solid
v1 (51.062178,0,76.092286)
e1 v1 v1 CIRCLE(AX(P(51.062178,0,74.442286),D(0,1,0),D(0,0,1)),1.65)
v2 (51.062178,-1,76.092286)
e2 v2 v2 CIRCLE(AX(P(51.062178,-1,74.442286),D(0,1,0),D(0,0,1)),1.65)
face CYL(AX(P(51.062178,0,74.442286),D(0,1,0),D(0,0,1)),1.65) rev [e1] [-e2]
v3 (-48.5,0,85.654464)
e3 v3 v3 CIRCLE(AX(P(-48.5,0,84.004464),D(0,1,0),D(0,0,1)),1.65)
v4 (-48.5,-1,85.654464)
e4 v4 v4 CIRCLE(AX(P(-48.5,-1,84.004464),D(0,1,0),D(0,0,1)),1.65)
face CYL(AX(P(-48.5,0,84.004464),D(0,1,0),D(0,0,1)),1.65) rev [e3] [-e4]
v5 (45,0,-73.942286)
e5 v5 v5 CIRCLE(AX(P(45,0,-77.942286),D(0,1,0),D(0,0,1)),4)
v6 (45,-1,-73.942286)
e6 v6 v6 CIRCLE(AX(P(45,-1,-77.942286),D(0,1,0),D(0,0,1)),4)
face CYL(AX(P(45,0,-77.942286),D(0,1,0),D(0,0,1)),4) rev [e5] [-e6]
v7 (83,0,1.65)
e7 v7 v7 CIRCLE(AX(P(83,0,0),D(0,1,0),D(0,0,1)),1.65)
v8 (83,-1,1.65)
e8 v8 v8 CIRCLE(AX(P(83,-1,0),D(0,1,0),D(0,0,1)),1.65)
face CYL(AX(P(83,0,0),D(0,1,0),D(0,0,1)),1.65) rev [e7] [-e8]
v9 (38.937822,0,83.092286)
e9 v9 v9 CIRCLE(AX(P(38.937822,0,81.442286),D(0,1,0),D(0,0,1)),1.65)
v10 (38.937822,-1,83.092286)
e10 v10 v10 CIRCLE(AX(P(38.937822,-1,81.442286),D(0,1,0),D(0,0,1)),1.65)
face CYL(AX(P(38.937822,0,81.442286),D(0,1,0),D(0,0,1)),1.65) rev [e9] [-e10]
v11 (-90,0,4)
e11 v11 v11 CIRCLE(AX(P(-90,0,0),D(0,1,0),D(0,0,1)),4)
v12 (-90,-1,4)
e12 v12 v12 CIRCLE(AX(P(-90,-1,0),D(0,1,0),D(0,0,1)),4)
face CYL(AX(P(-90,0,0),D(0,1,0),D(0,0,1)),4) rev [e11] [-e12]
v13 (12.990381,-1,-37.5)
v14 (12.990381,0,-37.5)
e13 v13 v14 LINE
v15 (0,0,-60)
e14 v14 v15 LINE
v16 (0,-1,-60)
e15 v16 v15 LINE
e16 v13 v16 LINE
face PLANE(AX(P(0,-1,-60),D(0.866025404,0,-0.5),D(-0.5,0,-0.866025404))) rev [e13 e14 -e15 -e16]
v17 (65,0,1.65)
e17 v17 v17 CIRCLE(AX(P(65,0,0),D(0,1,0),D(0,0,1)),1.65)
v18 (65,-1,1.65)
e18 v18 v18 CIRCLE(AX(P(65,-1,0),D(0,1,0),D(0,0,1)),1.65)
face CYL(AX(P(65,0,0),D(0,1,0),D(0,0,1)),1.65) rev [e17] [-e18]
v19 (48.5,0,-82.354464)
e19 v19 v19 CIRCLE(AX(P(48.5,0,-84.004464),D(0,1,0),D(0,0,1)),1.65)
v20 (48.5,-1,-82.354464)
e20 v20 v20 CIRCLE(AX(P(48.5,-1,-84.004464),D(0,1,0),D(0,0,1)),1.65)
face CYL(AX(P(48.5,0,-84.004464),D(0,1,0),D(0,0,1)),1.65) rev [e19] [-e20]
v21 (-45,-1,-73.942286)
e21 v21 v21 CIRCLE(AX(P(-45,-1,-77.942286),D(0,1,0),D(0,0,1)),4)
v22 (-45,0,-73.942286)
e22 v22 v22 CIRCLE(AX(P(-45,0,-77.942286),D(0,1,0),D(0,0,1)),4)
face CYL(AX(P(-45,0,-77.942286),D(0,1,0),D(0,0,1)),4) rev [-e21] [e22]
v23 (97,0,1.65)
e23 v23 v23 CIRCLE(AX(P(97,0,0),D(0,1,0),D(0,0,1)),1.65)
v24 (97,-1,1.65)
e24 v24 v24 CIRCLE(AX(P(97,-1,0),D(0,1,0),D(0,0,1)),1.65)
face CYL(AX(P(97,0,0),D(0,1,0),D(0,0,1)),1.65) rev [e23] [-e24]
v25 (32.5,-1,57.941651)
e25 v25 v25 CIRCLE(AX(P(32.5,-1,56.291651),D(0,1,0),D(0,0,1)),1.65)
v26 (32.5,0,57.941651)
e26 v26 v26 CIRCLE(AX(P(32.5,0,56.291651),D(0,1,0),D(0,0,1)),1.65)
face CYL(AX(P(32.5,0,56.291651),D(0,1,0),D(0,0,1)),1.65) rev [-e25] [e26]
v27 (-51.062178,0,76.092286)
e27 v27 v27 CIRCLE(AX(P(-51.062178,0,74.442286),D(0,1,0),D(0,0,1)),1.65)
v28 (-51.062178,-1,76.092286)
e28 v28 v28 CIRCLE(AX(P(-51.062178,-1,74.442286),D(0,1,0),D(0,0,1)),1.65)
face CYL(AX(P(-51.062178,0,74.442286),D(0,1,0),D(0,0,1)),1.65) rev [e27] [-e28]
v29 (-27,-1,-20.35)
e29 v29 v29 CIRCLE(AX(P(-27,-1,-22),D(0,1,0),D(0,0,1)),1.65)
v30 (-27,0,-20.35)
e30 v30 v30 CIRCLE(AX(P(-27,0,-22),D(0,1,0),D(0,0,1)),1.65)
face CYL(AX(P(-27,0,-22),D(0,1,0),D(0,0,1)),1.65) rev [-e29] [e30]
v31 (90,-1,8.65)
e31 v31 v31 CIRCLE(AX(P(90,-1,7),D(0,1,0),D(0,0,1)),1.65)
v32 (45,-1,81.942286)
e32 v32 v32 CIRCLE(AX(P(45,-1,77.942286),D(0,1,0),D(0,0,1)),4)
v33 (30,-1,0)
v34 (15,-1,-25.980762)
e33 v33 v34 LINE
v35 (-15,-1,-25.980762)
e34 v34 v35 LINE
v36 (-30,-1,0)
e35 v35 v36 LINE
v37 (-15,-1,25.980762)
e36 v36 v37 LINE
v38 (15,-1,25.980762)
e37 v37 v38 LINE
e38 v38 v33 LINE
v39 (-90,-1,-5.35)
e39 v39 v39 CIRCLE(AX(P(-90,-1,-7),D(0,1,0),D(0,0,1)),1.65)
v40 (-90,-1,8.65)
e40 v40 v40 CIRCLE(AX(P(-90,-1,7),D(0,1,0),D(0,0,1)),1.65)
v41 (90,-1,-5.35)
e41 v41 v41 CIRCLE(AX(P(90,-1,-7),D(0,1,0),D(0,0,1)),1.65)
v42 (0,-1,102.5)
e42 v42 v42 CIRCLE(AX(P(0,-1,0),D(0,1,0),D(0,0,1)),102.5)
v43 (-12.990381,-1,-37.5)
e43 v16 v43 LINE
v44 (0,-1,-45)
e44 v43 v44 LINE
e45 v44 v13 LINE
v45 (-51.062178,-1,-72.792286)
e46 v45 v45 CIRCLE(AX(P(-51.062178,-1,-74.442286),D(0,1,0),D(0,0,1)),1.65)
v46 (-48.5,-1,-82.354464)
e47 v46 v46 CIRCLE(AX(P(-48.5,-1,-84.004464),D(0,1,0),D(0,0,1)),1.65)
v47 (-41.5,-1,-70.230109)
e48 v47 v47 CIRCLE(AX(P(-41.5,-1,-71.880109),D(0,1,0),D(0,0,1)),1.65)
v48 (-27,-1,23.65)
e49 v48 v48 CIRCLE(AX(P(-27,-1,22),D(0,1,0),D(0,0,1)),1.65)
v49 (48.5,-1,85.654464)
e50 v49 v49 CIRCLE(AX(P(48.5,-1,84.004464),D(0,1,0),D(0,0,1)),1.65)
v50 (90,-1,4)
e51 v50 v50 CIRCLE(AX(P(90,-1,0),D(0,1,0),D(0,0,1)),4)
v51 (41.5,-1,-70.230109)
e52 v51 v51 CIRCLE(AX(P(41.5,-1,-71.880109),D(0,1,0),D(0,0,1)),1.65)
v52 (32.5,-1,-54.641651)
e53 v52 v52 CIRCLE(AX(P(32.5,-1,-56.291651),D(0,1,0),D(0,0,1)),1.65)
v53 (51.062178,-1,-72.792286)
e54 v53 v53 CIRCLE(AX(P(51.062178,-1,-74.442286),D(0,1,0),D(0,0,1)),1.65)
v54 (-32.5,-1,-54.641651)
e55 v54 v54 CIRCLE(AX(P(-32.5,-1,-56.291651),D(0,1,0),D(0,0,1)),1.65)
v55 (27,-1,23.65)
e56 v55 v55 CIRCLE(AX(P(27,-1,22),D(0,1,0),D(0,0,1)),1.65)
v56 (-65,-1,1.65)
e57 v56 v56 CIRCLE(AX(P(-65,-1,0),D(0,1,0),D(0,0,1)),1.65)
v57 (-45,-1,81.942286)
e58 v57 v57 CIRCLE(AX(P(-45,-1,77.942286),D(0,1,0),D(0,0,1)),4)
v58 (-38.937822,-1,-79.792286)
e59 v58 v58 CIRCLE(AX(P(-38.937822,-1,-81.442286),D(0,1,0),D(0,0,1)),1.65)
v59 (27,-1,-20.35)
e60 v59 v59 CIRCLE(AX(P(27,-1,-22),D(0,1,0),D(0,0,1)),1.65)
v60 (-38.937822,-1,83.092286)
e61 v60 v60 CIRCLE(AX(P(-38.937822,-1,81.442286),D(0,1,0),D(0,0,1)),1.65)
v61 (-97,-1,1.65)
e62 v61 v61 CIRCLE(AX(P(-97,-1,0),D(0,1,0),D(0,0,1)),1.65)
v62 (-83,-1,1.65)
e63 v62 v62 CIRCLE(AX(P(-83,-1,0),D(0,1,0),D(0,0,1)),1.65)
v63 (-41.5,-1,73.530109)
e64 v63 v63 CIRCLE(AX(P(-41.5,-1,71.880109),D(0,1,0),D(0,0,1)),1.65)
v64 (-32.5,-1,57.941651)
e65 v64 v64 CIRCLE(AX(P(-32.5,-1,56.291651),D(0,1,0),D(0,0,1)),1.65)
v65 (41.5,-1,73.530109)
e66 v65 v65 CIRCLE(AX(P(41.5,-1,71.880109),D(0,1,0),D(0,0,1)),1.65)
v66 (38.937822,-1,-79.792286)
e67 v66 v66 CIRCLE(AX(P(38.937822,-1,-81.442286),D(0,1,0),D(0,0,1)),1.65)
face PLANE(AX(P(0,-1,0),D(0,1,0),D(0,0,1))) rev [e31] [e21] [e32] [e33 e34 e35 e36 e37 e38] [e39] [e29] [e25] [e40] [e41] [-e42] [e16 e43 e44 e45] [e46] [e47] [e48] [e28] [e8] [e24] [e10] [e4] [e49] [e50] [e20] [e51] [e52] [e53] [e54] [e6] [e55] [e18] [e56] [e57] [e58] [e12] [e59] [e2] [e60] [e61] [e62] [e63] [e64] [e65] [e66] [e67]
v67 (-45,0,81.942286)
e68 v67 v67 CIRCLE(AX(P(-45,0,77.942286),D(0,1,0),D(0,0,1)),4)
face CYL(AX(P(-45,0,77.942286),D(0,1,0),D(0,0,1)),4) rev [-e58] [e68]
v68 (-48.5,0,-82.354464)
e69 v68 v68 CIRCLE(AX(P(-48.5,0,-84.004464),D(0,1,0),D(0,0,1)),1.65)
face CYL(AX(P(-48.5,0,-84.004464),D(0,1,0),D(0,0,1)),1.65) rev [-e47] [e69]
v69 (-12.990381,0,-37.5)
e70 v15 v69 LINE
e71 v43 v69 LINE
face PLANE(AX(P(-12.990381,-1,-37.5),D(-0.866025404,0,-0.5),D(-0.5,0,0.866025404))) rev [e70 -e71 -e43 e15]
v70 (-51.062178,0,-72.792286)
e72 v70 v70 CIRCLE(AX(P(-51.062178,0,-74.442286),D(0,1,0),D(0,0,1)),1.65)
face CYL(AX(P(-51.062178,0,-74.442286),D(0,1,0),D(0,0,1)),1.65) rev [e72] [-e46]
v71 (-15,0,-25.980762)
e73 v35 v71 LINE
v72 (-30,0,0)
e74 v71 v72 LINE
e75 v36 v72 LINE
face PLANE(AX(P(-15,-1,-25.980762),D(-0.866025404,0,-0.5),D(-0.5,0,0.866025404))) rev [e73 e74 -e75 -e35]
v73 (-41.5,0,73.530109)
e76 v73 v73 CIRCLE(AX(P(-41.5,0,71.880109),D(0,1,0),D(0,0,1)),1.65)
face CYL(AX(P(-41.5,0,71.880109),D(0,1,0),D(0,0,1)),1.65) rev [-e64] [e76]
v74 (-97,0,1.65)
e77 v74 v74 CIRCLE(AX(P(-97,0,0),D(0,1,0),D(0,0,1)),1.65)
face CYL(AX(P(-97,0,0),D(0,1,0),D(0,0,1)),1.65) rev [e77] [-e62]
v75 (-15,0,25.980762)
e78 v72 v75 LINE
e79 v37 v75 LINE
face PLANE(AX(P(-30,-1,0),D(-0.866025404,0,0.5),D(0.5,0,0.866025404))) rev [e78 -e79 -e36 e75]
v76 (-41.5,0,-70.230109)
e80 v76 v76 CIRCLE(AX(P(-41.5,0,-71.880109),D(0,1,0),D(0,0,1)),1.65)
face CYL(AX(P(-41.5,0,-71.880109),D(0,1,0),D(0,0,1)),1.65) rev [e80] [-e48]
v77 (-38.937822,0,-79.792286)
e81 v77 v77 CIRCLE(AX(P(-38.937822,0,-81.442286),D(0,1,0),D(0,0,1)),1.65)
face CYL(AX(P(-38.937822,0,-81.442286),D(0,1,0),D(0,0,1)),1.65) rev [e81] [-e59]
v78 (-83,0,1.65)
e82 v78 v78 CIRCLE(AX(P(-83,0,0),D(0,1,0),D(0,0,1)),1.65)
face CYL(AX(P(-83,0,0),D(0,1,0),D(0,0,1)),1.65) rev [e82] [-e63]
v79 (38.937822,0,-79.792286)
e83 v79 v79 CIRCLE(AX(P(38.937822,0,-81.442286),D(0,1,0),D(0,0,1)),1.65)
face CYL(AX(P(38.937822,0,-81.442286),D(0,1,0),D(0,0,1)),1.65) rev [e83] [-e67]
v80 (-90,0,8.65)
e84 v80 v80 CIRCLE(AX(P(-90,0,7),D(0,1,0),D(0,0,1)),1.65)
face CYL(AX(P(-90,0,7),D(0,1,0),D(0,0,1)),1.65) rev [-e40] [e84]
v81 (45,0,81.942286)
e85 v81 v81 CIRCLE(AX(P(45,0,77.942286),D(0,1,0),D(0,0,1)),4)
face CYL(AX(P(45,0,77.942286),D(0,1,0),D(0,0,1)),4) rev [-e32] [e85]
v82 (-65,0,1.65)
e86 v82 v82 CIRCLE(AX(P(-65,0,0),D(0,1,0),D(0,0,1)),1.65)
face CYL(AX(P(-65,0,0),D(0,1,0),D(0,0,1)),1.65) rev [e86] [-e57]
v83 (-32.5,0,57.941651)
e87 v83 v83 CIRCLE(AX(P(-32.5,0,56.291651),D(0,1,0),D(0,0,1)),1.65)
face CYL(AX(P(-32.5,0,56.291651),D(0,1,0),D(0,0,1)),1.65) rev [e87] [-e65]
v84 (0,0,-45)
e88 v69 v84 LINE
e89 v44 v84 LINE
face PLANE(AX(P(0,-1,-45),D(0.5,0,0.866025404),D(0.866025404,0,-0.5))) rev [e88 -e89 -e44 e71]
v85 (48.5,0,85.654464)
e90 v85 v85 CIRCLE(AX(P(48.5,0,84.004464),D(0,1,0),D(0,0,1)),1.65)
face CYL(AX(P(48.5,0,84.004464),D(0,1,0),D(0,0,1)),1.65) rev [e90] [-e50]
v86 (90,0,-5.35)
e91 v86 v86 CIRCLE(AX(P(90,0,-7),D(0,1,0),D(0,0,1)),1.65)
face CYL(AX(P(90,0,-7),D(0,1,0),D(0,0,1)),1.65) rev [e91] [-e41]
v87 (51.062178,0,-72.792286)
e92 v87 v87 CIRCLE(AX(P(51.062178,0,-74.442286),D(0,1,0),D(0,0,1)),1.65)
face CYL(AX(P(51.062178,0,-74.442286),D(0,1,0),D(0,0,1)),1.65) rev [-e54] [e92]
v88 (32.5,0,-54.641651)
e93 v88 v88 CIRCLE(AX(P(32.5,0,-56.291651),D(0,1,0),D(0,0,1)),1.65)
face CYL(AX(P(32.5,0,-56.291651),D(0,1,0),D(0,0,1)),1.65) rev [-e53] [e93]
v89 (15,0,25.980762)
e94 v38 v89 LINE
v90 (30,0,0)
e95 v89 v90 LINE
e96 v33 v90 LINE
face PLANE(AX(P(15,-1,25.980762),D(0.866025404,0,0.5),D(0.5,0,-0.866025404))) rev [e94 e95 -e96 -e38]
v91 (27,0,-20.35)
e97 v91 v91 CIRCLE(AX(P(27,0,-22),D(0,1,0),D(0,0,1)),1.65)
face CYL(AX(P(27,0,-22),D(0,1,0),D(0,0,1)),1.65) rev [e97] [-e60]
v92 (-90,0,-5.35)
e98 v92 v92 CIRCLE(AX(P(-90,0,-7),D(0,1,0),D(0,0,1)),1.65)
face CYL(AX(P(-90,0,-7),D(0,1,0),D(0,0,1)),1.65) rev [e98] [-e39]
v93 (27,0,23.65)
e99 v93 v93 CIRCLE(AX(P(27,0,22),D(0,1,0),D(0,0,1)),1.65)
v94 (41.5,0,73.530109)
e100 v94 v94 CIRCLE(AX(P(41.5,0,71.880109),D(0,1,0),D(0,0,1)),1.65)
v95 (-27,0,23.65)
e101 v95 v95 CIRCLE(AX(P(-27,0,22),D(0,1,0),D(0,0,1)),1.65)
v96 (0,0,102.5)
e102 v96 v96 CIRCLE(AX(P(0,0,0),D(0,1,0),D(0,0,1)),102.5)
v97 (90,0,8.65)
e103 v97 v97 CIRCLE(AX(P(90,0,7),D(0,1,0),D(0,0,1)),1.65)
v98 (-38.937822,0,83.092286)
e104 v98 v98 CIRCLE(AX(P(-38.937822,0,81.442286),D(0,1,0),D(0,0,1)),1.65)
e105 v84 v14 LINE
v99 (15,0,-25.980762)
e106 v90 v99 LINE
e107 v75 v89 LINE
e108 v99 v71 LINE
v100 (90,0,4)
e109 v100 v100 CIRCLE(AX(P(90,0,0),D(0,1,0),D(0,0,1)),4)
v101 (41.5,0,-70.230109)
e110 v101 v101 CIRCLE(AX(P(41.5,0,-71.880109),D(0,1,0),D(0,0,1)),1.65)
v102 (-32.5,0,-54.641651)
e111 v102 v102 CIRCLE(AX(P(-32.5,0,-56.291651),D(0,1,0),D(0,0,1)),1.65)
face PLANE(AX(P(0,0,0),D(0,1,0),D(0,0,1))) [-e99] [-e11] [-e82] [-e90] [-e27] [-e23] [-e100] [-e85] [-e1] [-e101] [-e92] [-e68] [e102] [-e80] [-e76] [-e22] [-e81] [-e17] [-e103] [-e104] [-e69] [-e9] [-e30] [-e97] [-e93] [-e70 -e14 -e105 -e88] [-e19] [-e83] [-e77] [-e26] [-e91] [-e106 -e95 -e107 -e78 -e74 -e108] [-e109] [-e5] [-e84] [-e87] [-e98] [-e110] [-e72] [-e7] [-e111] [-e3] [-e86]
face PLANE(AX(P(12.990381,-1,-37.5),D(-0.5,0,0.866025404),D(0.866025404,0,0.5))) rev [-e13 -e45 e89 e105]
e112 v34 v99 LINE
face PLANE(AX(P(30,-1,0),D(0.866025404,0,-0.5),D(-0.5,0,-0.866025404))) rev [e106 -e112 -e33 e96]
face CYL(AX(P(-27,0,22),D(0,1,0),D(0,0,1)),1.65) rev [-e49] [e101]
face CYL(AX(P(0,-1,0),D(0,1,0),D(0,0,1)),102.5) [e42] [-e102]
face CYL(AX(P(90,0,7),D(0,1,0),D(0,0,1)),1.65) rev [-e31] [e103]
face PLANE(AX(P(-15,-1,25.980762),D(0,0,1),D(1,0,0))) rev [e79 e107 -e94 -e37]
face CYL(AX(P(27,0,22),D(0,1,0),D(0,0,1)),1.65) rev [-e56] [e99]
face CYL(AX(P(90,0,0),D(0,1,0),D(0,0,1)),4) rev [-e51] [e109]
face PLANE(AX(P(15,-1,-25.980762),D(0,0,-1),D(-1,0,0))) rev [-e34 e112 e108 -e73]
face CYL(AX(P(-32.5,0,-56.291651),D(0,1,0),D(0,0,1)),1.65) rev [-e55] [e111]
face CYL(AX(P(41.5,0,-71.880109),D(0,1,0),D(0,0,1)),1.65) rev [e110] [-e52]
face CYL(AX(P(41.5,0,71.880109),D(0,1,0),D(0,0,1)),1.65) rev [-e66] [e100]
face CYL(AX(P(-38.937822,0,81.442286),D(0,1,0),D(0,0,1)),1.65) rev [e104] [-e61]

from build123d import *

# Parameters (mm, degrees)
SKETCH_1_R               = 102.5
SM_BASE_FLANGE_1_DEPTH   = 1
HOLE_WIZARD_8_0_8_1_D    = 8
PATTERN_CIRCULAR_1_COUNT = 6
HOLE_WIZARD_3_3_3_3_1_D  = 3.3
HOLE_WIZARD_3_3_3_3_2_D  = 3.3
HOLE_WIZARD_3_3_3_3_3_D  = 3.3


# Sheet-metal steps are written as plain solids
with BuildPart() as part:
    # Sketch 1 → 基体-法兰1 (new body)
    with BuildSketch(Plane(origin=(0, 0, 0), x_dir=(1, 0, 0), z_dir=(0, 1, 0))):
        with Locations(Location((0, 0, 0), (0, 0, 270))):
            Circle(SKETCH_1_R)
        Polygon((-12.990381057, 37.5), (0, 60), (12.990381057, 37.5), (0, 45), align=None, mode=Mode.SUBTRACT)
        Polygon((30, 0), (15, 25.980762114), (-15, 25.980762114), (-30, 0), (-15, -25.980762114), (15, -25.980762114), align=None, mode=Mode.SUBTRACT)
    extrude(amount=-SM_BASE_FLANGE_1_DEPTH)

    # Ø8.0 (8) 直径孔1 (through all)
    with Locations(Plane(origin=(0, 0, 0), x_dir=(1, 0, 0), z_dir=(0, 1, 0))):
        with Locations((-45, 77.942286341)):
            hole_wizard_8_0_8_1 = Hole(HOLE_WIZARD_8_0_8_1_D / 2)

    # 阵列(圆周)1: Ø8.0 (8) 直径孔1 ×6 about axis
    pattern_circular_1_axis = Axis((0, 0, 0), (0, 1, 0))
    for i in range(1, PATTERN_CIRCULAR_1_COUNT):
        add(hole_wizard_8_0_8_1.rotate(pattern_circular_1_axis, i * 360 / PATTERN_CIRCULAR_1_COUNT), mode=Mode.SUBTRACT)

    # Ø3.3 (3.3) 直径孔1 (through all)
    with Locations(Plane(origin=(0, 0, 0), x_dir=(1, 0, 0), z_dir=(0, 1, 0))):
        with Locations((-48.5, 84.004464167), (-51.062177826, 74.442286341), (-41.5, 71.880108514), (-38.937822174, 81.442286341), (48.5, 84.004464167), (38.937822174, 81.442286341), (51.062177826, 74.442286341), (41.5, 71.880108514), (90, 7), (90, -7), (97, 0), (83, 0), (-83, 0), (-97, 0), (-90, 7), (-90, -7), (-48.5, -84.004464167), (-38.937822174, -81.442286341), (-41.5, -71.880108514), (-51.062177826, -74.442286341), (51.062177826, -74.442286341), (41.5, -71.880108514), (38.937822174, -81.442286341), (48.5, -84.004464167)):
            Hole(HOLE_WIZARD_3_3_3_3_1_D / 2)

    # Ø3.3 (3.3) 直径孔2 (through all)
    with Locations(Plane(origin=(0, 0, 0), x_dir=(1, 0, 0), z_dir=(0, 1, 0))):
        with Locations((32.5, -56.291651246), (65, 0), (32.5, 56.291651246), (-32.5, 56.291651246), (-65, 0), (-32.5, -56.291651246)):
            Hole(HOLE_WIZARD_3_3_3_3_2_D / 2)

    # Ø3.3 (3.3) 直径孔3 (through all)
    with Locations(Plane(origin=(0, 0, 0), x_dir=(1, 0, 0), z_dir=(0, 1, 0))):
        with Locations((0, 0), (27, -22), (-27, 22), (-27, -22), (27, 22)):
            Hole(HOLE_WIZARD_3_3_3_3_3_D / 2)


solid = part.part
